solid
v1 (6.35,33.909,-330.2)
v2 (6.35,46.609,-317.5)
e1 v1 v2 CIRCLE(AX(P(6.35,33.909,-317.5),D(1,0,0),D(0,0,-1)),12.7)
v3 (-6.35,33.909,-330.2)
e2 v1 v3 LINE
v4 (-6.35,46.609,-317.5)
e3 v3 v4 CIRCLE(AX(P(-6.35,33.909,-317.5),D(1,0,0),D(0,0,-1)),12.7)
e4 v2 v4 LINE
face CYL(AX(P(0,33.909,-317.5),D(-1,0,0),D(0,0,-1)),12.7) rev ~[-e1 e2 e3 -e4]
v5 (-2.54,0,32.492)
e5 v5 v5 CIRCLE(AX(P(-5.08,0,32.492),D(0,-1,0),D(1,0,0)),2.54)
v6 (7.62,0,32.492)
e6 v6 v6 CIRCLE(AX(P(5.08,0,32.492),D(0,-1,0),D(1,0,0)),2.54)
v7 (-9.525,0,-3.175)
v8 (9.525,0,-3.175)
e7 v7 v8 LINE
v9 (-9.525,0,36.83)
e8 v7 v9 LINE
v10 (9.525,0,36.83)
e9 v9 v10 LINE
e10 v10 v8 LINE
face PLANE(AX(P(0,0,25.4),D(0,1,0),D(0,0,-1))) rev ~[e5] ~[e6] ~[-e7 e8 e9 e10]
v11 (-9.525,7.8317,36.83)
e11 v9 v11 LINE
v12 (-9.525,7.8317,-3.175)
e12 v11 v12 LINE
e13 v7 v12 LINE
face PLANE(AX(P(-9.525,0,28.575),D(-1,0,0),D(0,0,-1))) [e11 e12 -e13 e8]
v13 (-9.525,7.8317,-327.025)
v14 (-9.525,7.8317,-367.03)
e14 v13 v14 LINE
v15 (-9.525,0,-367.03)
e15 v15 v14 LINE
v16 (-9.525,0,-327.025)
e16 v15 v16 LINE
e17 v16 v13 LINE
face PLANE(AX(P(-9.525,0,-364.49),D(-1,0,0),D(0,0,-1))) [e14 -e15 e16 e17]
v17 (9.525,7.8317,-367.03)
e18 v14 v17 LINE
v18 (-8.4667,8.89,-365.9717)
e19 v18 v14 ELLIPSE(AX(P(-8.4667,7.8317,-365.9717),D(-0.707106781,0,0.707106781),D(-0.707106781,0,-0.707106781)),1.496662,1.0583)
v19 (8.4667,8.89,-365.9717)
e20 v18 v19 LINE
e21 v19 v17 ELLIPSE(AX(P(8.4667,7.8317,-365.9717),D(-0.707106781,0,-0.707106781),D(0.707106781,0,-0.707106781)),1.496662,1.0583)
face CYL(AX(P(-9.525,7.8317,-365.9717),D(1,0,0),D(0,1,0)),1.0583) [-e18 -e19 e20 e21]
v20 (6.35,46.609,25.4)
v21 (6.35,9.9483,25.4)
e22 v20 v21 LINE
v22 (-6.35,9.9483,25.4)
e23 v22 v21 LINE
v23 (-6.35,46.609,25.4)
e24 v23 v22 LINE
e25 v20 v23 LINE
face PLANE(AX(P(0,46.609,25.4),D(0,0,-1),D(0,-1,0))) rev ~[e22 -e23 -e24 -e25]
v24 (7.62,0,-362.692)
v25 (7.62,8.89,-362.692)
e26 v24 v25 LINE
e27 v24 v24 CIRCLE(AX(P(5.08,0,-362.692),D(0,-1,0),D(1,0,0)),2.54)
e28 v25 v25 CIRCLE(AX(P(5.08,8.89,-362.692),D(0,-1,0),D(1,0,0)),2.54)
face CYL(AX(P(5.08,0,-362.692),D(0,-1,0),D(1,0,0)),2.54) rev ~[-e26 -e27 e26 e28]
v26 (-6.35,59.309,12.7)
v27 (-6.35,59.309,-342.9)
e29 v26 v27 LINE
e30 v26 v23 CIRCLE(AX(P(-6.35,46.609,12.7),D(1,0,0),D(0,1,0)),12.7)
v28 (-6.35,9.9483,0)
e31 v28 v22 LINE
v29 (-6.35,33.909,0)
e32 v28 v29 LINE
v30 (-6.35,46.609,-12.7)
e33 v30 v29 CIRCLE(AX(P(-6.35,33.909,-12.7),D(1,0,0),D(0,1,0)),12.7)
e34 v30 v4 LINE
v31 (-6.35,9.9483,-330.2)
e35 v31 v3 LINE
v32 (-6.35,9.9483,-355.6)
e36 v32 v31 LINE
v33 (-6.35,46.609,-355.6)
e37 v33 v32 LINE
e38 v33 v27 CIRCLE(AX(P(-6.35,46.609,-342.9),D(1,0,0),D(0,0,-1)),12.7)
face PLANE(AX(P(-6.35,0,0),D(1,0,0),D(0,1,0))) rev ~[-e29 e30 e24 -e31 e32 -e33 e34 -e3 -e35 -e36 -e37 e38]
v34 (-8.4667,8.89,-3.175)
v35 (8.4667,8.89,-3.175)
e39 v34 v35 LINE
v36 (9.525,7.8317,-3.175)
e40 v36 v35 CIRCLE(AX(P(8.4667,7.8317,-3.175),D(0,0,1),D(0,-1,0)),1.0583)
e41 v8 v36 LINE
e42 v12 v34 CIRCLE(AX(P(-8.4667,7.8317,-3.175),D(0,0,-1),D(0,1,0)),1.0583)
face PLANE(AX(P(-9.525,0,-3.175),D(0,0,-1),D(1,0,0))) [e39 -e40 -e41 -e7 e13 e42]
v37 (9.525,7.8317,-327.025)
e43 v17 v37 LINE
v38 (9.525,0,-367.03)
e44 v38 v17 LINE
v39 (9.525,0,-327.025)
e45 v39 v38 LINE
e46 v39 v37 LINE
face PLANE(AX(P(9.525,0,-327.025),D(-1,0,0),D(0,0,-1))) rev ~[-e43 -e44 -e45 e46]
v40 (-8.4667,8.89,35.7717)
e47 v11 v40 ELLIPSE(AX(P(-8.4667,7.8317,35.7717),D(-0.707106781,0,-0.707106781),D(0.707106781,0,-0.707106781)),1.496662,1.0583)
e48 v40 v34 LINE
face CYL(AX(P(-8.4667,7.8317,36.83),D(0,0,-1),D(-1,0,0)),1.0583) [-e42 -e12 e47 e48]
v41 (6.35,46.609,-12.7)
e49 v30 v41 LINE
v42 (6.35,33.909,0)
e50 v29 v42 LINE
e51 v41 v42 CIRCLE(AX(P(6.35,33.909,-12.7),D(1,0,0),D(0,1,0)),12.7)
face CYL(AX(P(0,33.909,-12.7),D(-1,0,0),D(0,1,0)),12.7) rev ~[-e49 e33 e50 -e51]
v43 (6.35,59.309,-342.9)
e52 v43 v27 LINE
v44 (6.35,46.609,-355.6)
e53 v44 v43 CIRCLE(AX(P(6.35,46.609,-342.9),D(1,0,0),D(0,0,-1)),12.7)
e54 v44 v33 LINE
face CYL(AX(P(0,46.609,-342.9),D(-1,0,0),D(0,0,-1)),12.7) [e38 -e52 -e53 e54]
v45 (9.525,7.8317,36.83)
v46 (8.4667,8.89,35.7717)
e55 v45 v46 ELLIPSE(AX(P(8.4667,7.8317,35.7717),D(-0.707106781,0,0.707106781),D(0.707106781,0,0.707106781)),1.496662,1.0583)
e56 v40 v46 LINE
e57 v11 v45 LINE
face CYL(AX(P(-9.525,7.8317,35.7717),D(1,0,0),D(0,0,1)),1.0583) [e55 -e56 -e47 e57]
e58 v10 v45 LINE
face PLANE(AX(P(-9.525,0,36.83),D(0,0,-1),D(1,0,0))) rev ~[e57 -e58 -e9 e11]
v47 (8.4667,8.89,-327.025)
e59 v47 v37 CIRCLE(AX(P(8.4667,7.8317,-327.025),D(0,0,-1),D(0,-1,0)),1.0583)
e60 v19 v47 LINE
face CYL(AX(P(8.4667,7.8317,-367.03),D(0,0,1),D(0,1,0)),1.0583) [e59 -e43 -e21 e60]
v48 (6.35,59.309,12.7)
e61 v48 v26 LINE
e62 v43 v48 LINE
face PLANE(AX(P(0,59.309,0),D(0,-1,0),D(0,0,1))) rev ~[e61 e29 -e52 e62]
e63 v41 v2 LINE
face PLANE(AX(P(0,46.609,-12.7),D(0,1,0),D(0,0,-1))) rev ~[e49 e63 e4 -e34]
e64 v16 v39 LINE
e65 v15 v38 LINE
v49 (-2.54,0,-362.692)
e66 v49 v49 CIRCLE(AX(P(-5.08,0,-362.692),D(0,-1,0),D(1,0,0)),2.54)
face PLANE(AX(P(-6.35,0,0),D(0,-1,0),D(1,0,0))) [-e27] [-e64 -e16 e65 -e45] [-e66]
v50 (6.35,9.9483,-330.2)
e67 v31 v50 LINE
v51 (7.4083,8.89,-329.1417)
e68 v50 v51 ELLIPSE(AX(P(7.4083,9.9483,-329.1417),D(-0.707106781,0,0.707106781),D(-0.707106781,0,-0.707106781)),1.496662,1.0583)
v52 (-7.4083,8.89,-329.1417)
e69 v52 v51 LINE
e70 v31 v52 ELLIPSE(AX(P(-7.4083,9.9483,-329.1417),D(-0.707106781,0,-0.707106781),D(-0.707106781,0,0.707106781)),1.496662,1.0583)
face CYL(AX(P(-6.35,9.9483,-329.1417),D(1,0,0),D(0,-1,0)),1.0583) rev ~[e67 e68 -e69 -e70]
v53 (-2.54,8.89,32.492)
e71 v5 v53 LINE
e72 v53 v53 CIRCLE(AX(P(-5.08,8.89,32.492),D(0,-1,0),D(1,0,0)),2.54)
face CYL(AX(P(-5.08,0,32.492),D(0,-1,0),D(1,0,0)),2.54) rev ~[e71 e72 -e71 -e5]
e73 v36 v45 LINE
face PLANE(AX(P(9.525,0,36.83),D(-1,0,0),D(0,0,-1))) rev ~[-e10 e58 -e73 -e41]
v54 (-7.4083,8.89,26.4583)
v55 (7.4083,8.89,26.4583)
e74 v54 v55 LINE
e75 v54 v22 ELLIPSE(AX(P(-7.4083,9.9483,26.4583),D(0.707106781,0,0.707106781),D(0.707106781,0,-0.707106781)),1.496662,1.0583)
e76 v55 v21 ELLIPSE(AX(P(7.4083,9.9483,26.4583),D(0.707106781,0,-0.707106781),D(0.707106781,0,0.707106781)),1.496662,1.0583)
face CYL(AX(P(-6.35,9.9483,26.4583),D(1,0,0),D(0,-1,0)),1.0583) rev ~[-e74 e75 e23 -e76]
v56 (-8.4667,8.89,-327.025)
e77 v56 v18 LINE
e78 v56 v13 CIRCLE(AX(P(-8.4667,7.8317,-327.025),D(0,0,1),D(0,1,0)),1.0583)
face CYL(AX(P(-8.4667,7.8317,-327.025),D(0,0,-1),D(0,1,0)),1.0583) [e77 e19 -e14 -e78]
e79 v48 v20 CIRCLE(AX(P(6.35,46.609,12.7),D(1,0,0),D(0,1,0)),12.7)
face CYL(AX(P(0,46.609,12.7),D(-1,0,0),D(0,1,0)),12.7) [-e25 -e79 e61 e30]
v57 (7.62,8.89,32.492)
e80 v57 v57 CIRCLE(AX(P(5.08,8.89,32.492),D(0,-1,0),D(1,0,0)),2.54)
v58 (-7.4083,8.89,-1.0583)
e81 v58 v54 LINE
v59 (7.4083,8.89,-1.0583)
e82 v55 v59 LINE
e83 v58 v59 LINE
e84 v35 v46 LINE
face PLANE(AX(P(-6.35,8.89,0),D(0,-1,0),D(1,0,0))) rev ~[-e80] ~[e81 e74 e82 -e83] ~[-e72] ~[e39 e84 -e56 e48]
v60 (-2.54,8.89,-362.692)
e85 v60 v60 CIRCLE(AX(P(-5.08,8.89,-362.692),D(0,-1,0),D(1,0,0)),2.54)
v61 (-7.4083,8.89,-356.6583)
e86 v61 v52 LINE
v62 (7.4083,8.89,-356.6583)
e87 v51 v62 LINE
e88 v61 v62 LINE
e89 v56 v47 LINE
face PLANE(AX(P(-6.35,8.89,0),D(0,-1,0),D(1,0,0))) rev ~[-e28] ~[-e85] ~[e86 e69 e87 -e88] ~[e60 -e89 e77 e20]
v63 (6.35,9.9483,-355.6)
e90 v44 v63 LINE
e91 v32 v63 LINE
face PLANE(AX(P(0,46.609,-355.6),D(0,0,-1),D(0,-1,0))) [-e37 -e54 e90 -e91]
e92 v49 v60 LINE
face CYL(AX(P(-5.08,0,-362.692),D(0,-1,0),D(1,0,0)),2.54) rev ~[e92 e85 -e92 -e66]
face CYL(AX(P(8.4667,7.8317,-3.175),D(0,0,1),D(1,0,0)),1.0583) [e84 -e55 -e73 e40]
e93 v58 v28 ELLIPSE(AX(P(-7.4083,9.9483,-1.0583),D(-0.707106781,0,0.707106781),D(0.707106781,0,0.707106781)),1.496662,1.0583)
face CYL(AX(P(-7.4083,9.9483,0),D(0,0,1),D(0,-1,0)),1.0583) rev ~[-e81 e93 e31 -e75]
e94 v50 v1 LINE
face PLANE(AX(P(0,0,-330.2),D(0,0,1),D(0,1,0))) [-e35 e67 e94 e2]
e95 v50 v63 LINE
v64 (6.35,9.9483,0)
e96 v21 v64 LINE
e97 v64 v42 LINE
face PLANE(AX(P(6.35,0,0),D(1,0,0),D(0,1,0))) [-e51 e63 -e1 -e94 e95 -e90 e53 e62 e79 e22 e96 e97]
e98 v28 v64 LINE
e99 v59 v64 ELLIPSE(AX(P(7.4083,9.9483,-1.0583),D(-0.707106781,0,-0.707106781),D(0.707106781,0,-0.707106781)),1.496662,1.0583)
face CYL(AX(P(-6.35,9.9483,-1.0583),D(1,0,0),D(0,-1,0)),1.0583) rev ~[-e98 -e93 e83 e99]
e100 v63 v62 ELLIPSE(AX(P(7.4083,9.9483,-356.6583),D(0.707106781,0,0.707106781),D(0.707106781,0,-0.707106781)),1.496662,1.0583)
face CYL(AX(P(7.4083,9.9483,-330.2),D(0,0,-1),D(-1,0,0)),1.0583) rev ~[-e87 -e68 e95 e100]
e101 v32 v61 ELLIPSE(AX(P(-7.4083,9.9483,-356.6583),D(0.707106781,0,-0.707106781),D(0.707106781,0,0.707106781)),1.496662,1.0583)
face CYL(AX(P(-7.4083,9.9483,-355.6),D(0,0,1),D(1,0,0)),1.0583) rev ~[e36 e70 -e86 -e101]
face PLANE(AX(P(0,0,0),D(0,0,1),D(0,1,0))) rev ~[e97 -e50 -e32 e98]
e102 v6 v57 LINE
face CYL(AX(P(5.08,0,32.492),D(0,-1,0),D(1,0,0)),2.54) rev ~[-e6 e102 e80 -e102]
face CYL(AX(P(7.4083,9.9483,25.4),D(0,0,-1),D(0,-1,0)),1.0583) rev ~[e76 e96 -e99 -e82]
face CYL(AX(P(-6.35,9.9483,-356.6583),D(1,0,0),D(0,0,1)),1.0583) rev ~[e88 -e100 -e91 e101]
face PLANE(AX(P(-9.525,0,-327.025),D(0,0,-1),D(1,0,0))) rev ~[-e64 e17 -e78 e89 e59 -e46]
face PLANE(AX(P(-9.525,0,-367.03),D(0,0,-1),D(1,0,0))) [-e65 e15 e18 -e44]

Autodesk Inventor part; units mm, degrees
ref_plane "YZ Plane" through (0, 0, 0) normal (1, 0, 0) x (0, 1, 0)
ref_plane "XZ Plane" through (0, 0, 0) normal (0, 1, 0) x (-1, 0, 0)
ref_plane "XY Plane" through (0, 0, 0) normal (0, 0, 1) x (1, 0, 0)
sketch "Sketch1" plane through (0, 0, 0) normal (1, 0, 0) x (0, 1, 0)
  line L0 (0, 0) -> (33.909, 0)
  line L1 (59.309, 0) -> (59.309, 12.7)
  line L2 (46.609, 25.4) -> (0, 25.4)
  line L3 (0, 25.4) -> (0, 0)
  line L4 (46.609, -12.7) -> (46.609, -317.5)
  line L5 (59.309, -342.9) -> (59.309, 12.7)
  line L6 (46.609, -355.6) -> (0, -355.6)
  line L7 (0, -355.6) -> (0, -330.2)
  line L8 (0, -330.2) -> (33.909, -330.2)
  arc A0 (59.309, 12.7) -> (46.609, 25.4) centre (46.609, 12.7) ccw
  arc A1 (46.609, -12.7) -> (33.909, 0) centre (33.909, -12.7) ccw
  arc A2 (33.909, -330.2) -> (46.609, -317.5) centre (33.909, -317.5) ccw
  arc A3 (46.609, -355.6) -> (59.309, -342.9) centre (46.609, -342.9) ccw
  dimension "d5" = 25.4
  dimension "d6" = 12.7
  dimension "d7" = 12.7
  dimension "d8" = 12.7
  dimension "d9" = 381
  dimension "d10" = 25.4
  dimension "d11" = 59.309
  dimension "d15" = 59.309
extrude "Extrusion1" add sketch "Sketch1" along normal mid plane 12.7
sketch "Sketch2" plane through (-6.35, 0, 0) normal (0, -1, 0) x (1, 0, 0)
  line L0 (0, -355.6) -> (12.7, -355.6) projected
  line L1 (0, -330.2) -> (12.7, -330.2) projected
  line L2 (12.7, -355.6) -> (0, -355.6)
  line L3 (0, -355.6) -> (0, -330.2)
  line L4 (0, -330.2) -> (12.7, -330.2)
  line L5 (12.7, -330.2) -> (12.7, -355.6)
  line L6 (-3.175, -327.025) -> (15.875, -327.025)
  line L7 (15.875, -327.025) -> (15.875, -358.775)
  line L8 (-3.175, -358.775) -> (-3.175, -327.025)
  line L9 (12.7, -342.9) -> (0, -342.9) projected
  line L10 (-3.175, -327.025) -> (15.875, -358.775) construction
  line L11 (15.875, -327.025) -> (-3.175, -358.775) construction
  line L12 (15.875, -364.49) -> (15.875, -358.775)
  line L13 (-3.175, -358.775) -> (-3.175, -364.49)
  line L14 (-3.175, -367.03) -> (15.875, -367.03)
  line L15 (15.875, -367.03) -> (15.875, -364.49)
  line L16 (-3.175, -364.49) -> (-3.175, -367.03)
  circle A0 centre (1.27, -362.692) radius 2.54
  line L17 (6.35, -367.03) -> (6.35, -357.004) construction
  circle A1 centre (11.43, -362.692) radius 2.54
  line L18 (42.8308, -165.1) -> (-55.1073, -165.1) construction
  line L19 (0, 25.4) -> (12.7, 25.4)
  line L20 (0, 0) -> (12.7, 0)
  line L21 (12.7, 25.4) -> (0, 25.4)
  line L22 (0, 25.4) -> (0, 0)
  line L23 (0, 0) -> (12.7, 0)
  line L24 (12.7, 0) -> (12.7, 25.4)
  line L25 (-3.175, -3.175) -> (15.875, -3.175)
  line L26 (15.875, -3.175) -> (15.875, 28.575)
  line L27 (-3.175, 28.575) -> (-3.175, -3.175)
  line L28 (12.7, 12.7) -> (0, 12.7)
  line L29 (-3.175, -3.175) -> (15.875, 28.575) construction
  line L30 (15.875, -3.175) -> (-3.175, 28.575) construction
  line L31 (15.875, 34.29) -> (15.875, 28.575)
  line L32 (-3.175, 28.575) -> (-3.175, 34.29)
  line L33 (-3.175, 36.83) -> (15.875, 36.83)
  line L34 (15.875, 36.83) -> (15.875, 34.29)
  line L35 (-3.175, 34.29) -> (-3.175, 36.83)
  circle A2 centre (1.27, 32.492) radius 2.54
  line L36 (6.35, 36.83) -> (6.35, 26.804) construction
  circle A3 centre (11.43, 32.492) radius 2.54
  point P0 (0, 25.4)
  point P1 (12.7, 25.4)
  point P2 (6.35, -342.9)
  point P3 (6.35, 12.7)
  dimension "d16" = 19.05
  dimension "d17" = 31.75
  dimension "d27" = 5.08
  dimension "d28" = 4.445
extrude "Extrusion2" add sketch "Sketch2" against normal blind 8.89
fillet "Fillet1" radius 1.0583 14 edges at (0, 8.89, 36.83) (-9.525, 8.89, 16.8275) (9.525, 8.89, 16.8275) (-9.525, 8.89, -347.0275) (0, 8.89, -367.03) (9.525, 8.89, -347.0275) (6.35, 8.89, -342.9) (-6.35, 8.89, -342.9) (0, 8.89, -355.6) (0, 8.89, -330.2) (0, 8.89, 25.4) (-6.35, 8.89, 12.7) (0, 8.89, 0) (6.35, 8.89, 12.7)
properties part number "IndexRailOutSides" material "Polycarbonate, Clear"
